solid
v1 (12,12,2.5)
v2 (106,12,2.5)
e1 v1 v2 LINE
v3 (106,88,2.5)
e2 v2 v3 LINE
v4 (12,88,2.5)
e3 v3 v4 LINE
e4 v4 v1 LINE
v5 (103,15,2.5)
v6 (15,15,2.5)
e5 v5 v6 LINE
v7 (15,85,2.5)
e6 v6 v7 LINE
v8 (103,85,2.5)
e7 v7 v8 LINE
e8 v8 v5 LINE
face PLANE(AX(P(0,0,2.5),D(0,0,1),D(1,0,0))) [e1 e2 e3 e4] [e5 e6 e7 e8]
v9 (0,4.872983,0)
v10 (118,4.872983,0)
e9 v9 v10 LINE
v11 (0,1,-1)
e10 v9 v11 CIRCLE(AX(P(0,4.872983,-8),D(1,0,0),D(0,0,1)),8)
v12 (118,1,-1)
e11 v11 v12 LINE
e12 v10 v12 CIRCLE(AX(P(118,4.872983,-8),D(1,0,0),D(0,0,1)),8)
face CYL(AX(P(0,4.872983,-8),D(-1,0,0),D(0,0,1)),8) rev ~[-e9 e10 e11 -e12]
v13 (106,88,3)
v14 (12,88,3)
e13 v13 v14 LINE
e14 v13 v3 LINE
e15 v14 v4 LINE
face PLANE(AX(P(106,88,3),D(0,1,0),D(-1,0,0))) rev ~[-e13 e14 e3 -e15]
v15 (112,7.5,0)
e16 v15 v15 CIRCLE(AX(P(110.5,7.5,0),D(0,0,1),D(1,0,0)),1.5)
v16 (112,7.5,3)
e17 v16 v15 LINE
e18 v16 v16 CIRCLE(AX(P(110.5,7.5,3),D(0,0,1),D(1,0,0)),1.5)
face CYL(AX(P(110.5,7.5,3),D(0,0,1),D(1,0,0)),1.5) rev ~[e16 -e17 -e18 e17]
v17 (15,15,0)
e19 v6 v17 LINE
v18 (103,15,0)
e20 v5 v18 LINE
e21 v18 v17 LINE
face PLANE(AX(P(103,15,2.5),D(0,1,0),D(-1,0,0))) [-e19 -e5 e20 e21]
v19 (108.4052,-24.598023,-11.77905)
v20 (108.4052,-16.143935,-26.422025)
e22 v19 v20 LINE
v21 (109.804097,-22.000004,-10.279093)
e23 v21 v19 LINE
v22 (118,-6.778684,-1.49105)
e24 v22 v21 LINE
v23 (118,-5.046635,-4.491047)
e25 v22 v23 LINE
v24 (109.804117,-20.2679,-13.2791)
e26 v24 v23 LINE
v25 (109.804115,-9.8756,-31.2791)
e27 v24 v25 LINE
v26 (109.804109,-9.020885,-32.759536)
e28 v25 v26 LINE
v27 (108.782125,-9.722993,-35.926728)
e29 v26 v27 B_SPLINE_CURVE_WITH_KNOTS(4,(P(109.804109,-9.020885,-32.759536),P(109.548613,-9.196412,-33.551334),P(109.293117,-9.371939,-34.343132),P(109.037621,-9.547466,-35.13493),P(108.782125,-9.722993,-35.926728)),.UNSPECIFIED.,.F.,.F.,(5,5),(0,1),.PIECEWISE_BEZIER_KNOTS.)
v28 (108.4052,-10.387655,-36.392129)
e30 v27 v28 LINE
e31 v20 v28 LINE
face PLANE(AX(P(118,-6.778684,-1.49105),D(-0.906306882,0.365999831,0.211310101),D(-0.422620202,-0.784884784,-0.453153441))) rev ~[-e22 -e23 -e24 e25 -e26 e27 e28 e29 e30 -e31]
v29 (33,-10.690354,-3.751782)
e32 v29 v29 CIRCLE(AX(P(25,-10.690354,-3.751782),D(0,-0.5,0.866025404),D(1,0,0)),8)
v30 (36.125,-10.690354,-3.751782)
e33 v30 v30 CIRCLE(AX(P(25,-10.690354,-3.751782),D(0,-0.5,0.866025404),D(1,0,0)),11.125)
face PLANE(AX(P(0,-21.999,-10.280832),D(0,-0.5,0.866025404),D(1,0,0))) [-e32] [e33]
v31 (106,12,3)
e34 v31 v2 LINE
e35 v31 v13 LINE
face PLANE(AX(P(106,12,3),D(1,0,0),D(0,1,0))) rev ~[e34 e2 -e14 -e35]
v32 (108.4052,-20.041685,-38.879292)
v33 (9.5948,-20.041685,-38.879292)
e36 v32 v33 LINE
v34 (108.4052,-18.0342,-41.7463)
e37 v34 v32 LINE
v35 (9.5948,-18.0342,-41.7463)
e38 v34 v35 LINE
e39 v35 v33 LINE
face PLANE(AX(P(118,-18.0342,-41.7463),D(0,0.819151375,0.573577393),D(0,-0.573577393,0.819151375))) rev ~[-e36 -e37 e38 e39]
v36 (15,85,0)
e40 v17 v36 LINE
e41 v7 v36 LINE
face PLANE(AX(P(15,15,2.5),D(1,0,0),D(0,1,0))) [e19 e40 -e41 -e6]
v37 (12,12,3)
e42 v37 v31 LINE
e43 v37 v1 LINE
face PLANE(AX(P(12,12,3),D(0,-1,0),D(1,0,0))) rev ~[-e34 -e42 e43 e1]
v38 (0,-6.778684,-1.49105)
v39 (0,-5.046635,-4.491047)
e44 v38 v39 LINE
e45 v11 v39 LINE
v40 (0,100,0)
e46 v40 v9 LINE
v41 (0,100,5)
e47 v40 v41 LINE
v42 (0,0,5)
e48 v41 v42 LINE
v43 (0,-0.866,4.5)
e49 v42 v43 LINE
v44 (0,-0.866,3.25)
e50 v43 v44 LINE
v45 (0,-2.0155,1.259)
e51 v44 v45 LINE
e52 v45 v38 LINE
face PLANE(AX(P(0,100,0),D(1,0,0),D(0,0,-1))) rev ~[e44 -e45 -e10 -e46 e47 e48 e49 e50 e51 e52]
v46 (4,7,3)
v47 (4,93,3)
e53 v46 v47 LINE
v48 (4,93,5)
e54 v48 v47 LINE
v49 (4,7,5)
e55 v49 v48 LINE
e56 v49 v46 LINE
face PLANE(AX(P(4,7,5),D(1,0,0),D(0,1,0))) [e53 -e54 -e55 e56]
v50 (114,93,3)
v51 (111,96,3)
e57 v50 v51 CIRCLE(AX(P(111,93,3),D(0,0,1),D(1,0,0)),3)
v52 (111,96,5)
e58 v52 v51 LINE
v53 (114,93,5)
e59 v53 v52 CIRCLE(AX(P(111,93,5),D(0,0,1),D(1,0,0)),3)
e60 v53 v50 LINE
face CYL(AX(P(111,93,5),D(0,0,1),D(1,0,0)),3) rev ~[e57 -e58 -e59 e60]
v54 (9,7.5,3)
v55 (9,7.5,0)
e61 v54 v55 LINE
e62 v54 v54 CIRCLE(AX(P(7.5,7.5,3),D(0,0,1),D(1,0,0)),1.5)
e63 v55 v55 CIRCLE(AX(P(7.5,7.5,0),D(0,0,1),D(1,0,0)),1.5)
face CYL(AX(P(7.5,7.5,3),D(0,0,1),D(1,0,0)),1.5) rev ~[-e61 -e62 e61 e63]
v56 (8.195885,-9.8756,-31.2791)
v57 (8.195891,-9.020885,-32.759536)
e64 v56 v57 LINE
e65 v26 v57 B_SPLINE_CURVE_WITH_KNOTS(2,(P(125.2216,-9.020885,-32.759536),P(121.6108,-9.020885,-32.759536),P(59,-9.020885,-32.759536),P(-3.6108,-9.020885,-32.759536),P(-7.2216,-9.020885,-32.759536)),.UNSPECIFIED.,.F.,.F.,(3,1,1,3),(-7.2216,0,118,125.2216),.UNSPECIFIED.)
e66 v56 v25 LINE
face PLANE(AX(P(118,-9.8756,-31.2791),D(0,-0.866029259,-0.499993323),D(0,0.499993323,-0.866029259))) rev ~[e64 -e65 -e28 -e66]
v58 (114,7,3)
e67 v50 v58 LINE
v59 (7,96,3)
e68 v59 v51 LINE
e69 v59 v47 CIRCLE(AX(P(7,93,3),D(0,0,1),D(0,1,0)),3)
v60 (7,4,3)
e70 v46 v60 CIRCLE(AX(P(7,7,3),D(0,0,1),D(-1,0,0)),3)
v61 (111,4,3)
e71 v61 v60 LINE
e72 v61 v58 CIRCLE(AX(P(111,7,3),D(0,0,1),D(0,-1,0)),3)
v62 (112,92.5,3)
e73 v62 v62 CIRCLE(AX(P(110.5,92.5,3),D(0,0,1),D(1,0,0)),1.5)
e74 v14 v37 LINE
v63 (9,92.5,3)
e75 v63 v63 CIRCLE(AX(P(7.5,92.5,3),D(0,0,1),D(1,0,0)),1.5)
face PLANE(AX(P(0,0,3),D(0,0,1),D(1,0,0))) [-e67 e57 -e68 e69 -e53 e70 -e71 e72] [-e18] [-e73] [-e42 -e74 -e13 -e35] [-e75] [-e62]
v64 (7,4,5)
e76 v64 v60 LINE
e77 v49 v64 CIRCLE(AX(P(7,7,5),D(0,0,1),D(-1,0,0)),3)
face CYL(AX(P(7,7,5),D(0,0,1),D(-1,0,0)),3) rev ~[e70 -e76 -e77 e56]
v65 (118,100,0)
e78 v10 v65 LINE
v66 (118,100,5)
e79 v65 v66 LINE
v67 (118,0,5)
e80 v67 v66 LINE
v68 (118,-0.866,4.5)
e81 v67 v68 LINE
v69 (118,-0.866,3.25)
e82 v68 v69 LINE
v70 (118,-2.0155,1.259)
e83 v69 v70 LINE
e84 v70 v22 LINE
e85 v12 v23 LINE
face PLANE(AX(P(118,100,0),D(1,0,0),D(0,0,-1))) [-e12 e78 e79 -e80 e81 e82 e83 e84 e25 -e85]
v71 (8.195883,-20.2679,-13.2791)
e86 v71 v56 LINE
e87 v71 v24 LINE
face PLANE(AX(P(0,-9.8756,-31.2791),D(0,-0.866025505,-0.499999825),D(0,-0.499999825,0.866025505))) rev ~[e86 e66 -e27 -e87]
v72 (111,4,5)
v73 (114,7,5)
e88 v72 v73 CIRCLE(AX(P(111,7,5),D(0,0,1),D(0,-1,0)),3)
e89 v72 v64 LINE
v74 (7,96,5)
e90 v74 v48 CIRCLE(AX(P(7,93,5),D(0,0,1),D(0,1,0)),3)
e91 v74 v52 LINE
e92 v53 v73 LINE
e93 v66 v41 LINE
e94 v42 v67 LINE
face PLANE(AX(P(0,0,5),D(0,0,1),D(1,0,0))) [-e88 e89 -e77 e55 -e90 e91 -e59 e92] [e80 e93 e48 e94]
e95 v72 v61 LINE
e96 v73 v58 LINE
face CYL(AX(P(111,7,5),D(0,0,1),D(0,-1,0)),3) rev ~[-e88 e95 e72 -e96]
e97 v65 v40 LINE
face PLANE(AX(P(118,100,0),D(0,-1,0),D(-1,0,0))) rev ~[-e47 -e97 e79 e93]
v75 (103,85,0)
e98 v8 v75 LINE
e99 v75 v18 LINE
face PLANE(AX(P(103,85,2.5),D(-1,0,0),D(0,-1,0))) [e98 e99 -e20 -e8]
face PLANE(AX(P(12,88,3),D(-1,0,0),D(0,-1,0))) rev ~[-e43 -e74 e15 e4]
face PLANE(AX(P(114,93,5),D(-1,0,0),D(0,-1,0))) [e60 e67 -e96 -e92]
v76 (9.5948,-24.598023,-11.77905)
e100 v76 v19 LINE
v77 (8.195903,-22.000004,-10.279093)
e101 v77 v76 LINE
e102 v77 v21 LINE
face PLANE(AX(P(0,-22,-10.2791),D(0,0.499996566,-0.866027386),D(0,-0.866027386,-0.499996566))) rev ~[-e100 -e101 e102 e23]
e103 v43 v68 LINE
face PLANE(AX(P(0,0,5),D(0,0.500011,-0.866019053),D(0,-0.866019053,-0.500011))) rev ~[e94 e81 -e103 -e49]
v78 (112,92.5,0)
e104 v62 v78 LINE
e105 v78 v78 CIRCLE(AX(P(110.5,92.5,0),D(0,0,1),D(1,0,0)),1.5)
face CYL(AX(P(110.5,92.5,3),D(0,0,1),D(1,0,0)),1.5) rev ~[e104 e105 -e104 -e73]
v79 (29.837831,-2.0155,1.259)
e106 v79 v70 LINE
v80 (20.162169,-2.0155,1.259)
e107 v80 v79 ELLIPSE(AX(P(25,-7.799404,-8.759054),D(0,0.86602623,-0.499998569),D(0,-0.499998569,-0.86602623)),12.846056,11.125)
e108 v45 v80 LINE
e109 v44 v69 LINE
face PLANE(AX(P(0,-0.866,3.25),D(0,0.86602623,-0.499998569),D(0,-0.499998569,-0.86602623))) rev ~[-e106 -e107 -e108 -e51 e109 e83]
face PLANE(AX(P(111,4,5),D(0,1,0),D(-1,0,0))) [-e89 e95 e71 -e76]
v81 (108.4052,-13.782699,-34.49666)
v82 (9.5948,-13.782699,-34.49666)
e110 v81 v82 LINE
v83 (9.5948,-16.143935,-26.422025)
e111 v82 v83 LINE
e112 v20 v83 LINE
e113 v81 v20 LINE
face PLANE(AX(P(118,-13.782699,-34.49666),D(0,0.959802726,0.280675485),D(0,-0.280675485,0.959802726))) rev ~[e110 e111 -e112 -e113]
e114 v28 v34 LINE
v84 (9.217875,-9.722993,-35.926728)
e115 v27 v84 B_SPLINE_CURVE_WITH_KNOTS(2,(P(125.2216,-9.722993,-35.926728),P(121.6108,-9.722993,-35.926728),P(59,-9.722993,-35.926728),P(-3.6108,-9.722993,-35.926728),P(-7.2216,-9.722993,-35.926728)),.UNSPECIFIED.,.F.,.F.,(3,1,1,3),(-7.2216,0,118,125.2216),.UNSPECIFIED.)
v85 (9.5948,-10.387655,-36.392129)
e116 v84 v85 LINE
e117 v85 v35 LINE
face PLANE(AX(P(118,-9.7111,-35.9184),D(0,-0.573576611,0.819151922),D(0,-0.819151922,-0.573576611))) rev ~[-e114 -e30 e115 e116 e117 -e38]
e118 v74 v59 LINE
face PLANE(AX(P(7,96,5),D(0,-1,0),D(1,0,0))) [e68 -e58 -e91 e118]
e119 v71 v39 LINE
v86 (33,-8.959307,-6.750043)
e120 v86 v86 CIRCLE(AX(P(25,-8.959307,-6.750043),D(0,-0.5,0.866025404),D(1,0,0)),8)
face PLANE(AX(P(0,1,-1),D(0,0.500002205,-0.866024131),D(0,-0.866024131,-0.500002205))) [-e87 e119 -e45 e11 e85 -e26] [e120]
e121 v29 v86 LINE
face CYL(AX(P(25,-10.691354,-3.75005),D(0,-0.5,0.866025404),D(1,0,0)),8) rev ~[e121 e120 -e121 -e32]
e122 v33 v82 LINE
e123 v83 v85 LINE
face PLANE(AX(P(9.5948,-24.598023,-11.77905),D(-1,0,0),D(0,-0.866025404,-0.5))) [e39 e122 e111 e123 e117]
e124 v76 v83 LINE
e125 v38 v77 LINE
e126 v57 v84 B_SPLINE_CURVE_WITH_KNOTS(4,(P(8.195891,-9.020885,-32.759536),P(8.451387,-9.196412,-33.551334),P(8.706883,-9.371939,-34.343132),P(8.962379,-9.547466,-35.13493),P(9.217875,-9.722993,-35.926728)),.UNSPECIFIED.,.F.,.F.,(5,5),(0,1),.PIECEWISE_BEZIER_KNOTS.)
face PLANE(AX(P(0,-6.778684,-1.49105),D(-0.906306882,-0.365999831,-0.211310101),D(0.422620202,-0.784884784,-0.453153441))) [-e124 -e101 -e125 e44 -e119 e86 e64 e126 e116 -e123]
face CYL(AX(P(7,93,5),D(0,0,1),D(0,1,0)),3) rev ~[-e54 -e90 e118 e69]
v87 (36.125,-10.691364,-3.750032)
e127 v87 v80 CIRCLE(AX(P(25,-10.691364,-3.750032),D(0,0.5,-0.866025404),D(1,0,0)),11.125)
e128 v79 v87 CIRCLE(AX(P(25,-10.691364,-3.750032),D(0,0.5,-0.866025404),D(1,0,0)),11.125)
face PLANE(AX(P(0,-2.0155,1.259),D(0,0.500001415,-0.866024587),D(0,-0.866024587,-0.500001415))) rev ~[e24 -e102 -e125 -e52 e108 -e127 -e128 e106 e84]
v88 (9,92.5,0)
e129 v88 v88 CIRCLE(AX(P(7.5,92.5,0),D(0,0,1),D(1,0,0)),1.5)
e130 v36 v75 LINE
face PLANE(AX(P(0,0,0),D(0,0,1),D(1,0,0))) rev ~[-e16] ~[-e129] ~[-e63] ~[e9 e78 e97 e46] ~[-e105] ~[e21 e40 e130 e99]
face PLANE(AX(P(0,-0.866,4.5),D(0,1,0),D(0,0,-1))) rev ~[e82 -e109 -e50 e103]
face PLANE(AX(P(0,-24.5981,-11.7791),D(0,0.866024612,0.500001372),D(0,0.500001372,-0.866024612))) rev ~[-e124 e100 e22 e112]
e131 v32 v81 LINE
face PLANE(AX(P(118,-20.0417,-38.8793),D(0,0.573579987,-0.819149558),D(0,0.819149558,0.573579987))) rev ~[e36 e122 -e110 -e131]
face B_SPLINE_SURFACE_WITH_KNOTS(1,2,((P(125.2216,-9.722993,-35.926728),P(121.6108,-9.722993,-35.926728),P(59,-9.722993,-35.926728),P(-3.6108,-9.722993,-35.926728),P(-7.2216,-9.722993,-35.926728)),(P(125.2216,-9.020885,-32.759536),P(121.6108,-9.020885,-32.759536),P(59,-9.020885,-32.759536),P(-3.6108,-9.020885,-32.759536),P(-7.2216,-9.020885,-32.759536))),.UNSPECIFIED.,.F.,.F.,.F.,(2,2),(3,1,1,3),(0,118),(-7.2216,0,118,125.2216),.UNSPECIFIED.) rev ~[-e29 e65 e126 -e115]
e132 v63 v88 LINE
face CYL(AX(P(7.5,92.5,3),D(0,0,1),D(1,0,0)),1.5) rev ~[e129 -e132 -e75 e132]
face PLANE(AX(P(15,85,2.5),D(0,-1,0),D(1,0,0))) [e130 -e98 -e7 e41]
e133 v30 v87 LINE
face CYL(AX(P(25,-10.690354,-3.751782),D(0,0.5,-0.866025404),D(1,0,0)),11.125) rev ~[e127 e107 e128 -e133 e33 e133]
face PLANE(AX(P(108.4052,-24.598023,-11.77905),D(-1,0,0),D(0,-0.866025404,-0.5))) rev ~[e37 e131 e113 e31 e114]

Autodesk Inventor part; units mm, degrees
ref_plane "YZ Plane" through (0, 0, 0) normal (1, 0, 0) x (0, 1, 0)
ref_plane "XZ Plane" through (0, 0, 0) normal (0, 1, 0) x (-1, 0, 0)
ref_plane "XY Plane" through (0, 0, 0) normal (0, 0, 1) x (1, 0, 0)
sketch "Sketch1" plane through (0, 0, 0) normal (0, 0, 1) x (1, 0, 0)
  line L0 (0, 0) -> (118, 0)
  line L1 (118, 0) -> (118, 100)
  line L2 (118, 100) -> (0, 100)
  line L3 (0, 100) -> (0, 0)
  line L4 (-23.6, 0) -> (141.6, 0) projected
  line L5 (0, -20) -> (0, 120) projected
  dimension "d3" = 118
  dimension "d4" = 100
  dimension "d45" = 0
  dimension "d46" = 0
extrude "Extrusion1" add sketch "Sketch1" along normal blind 5
sketch "Sketch2" plane through (0, 0, 5) normal (0, 0, 1) x (1, 0, 0)
  line L0 (7, 96) -> (111, 96)
  line L1 (114, 93) -> (114, 7)
  line L2 (111, 4) -> (7, 4)
  line L3 (4, 7) -> (4, 93)
  line L4 (118, 100) -> (0, 100) projected
  line L5 (0, 100) -> (0, 0) projected
  line L6 (0, 0) -> (118, 0) projected
  arc A0 (7, 96) -> (4, 93) centre (7, 93) ccw
  arc A1 (114, 93) -> (111, 96) centre (111, 93) ccw
  arc A2 (111, 4) -> (114, 7) centre (111, 7) ccw
  arc A3 (4, 7) -> (7, 4) centre (7, 7) ccw
  point P0 (4, 96)
  point P1 (114, 4)
  point P2 (114, 96)
  dimension "d7" = 110
  dimension "d8" = 92
  dimension "d10" = 4
  dimension "d11" = 4
  dimension "d12" = 3
extrude "Extrusion2" cut sketch "Sketch2" against normal blind 2
sketch "Sketch3" plane through (0, 0, 3) normal (0, 0, 1) x (1, 0, 0)
  line L0 (12, 12) -> (106, 12)
  line L1 (106, 12) -> (106, 88)
  line L2 (106, 88) -> (12, 88)
  line L3 (12, 88) -> (12, 12)
  line L4 (7, 96) -> (111, 96) projected
  line L5 (111, 4) -> (7, 4) projected
  line L6 (4, 7) -> (4, 93) projected
  line L7 (114, 93) -> (114, 7) projected
  point P0 (0, 0)
  point P1 (114, 7)
  point P2 (11.024, 100)
  point P3 (121.024, 100)
  point P4 (120, 96)
  point P5 (120, 4)
  dimension "d19" = 8
  dimension "d20" = 8
  dimension "d21" = 8
  dimension "d22" = 8
extrude "Extrusion3" cut sketch "Sketch3" against normal blind 0.5
sketch "Sketch4" plane through (0, 0, 2.5) normal (0, 0, 1) x (1, 0, 0)
  line L0 (15, 85) -> (103, 85)
  line L1 (103, 85) -> (103, 15)
  line L2 (103, 15) -> (15, 15)
  line L3 (15, 15) -> (15, 85)
  line L4 (106, 12) -> (12, 12) projected
  line L5 (12, 12) -> (12, 88) projected
  point P0 (0, 0)
  dimension "d25" = 88
  dimension "d26" = 70
  dimension "d27" = 3
  dimension "d28" = 3
extrude "Extrusion4" cut sketch "Sketch4" against normal through all
sketch "Sketch5" plane through (0, 0, 3) normal (0, 0, 1) x (1, 0, 0)
  circle A0 centre (7.5, 7.5) radius 1.5
  circle A1 centre (110.5, 7.5) radius 1.5
  circle A2 centre (110.5, 92.5) radius 1.5
  circle A3 centre (7.5, 92.5) radius 1.5
  line L0 (7, 96) -> (111, 96) projected
  line L1 (4, 7) -> (4, 93) projected
  line L2 (111, 4) -> (7, 4) projected
  line L3 (114, 93) -> (114, 7) projected
  point P0 (0, 0)
  point P1 (114, 7)
  point P2 (11.024, 100)
  point P3 (121.024, 100)
  point P4 (120, 96)
  point P5 (120, 4)
  dimension "d31" = 3.5
  dimension "d32" = 3.5
  dimension "d33" = 3.5
  dimension "d34" = 3.5
  dimension "d35" = 3.5
  dimension "d36" = 3.5
  dimension "d37" = 3.5
  dimension "d38" = 3.5
  dimension "d39" = 3
  dimension "d40" = 3
  dimension "d41" = 3
  dimension "d42" = 3
extrude "Extrusion5" cut sketch "Sketch5" against normal blind 3.5
sketch "Sketch6" plane through (0, 0, 0) normal (-1, 0, 0) x (0, 0, 1)
  line L0 (-1, 1) -> (-13.2791, -20.2679)
  line L1 (5, 0) -> (5, 100) projected
  line L2 (1.259, -2.0155) -> (-10.2791, -22)
  line L3 (-13.2791, -20.2679) -> (-10.2791, -22)
  line L4 (-1, 1) -> (0, 1)
  line L5 (0, 0) -> (0, 100) projected
  line L6 (5, 0) -> (4.5, -0.866)
  line L7 (4.5, -0.866) -> (3.25, -0.866)
  line L8 (3.25, -0.866) -> (1.259, -2.0155)
  line L9 (0, 0) -> (5, 0) projected
  line L10 (5, 0) -> (0, 0)
  dimension "d47" = 30
  dimension "d48" = 30
  dimension "d49" = 90
  dimension "d50" = 22
  dimension "d51" = 120
  dimension "d52" = 1
  dimension "d53" = 1.25
  dimension "d54" = 150
  dimension "d55" = 0
  dimension "d57" = 90
  dimension "d58" = 1
  dimension "d59" = 3
  dimension "d60" = 1
  dimension "d67" = 30
  dimension "d68" = 120
  dimension "d69" = 150
extrude "Extrusion6" add sketch "Sketch6" against normal blind 118
sketch "Sketch7" plane through (0, -22, -10.2791) normal (0, -0.5, 0.8660254) x (1, 0, 0)
  line L0 (0, 26.6921) -> (118, 26.6921) projected
  circle A0 centre (25, 13.0581) radius 8
  line L1 (118, 25.0581) -> (0, 25.0581) projected
  line L2 (0, 0) -> (0, 23.0761) projected
  point P0 (0, 24.1921)
  dimension "d70" = 16
  dimension "d71" = 12
  dimension "d72" = 25
extrude "Extrusion7" cut sketch "Sketch7" against normal up to next
sketch "Sketch8" plane through (0, -22, -10.2791) normal (0, -0.5, 0.8660254) x (1, 0, 0)
  circle A0 centre (25, 13.0581) radius 8 projected
  circle A1 centre (25, 13.0581) radius 11.125
  point P0 (0, 24.1921)
  dimension "d75" = 22.25
extrude "Extrusion8" cut sketch "Sketch8" along normal blind 1
sketch "Sketch9" plane through (0, 100, 0) normal (-1, 0, 0) x (0, 0, 1)
  line L0 (-10.2791, -122) -> (1.259, -102.0155) projected
  line L1 (-10.2791, -122) -> (-11.7791, -124.5981)
  line L2 (-11.7791, -124.5981) -> (-32.7791, -112.4737)
  line L3 (-32.7791, -112.4737) -> (-31.2791, -109.8756)
  line L4 (-1, -99) -> (-13.2791, -120.2679) projected
  line L5 (-31.2791, -109.8756) -> (-13.2791, -120.2679)
  line L6 (-13.2791, -120.2679) -> (-10.2791, -122)
  point P0 (0, -100)
  dimension "d79" = 3
  dimension "d80" = 90
  dimension "d82" = 90
  dimension "d83" = 90
  dimension "d84" = 90
  dimension "d85" = 21
extrude "Extrusion9" add sketch "Sketch9" against normal blind 118
sketch "Sketch10" plane through (118, 100, 0) normal (1, 0, 0) x (0, 0, -1)
  line L0 (35.9184, -109.7111) -> (41.7463, -118.0342) projected
  line L1 (31.2791, -109.8756) -> (32.7791, -112.4737) projected
  line L2 (41.7463, -118.0342) -> (38.8793, -120.0417)
  line L3 (32.7791, -112.4737) -> (33.3495, -112.1444)
  line L4 (38.8793, -120.0417) -> (33.3495, -112.1444)
  line L5 (31.2791, -109.8756) -> (34.6648, -107.9209)
  line L6 (41.7463, -118.0342) -> (34.6648, -107.9209)
  line L7 (32.7791, -112.4737) -> (11.7791, -124.5981) projected
  point P0 (0, -100)
  dimension "d88" = 3.5
  dimension "d93" = 3.5
  dimension "d97" = 0
extrude "Extrusion10" add sketch "Sketch10" against normal blind 118
fillet "Fillet1" radius 8 1 edges at (59, 1, 0)
chamfer "Chamfer1" distance 2.2 angle 45 1 edges at (59, -7.9209, -34.6648)
chamfer "Chamfer2" distance 2 distance2 8 1 edges at (59, -12.1444, -33.3495) measured on face at (78.6667, -14.7768, -35.1927)
sketch "Sketch11" plane through (25, -10.6913, -3.75) normal (0, -0.5, 0.8660254) x (1, 0, 0)
  line L0 (-25, -16.0581) -> (-25, 10.0179) projected
  line L1 (-25, 10.0179) -> (-25, 4.5179)
  line L2 (-25, 4.5179) -> (-15.4052, -16.0581)
  line L3 (-25, -25.6623) -> (-25, -18.0505) projected
  line L4 (-25, 4.5179) -> (-25, -25.6623)
  line L5 (-25, -25.6623) -> (-15.4052, -25.6623)
  line L6 (-25, -16.0581) -> (93, -16.0581) projected
  line L7 (-15.4052, -16.0581) -> (-15.4052, -25.6623)
  line L8 (93, 10.0179) -> (93, 4.5179)
  line L9 (93, 4.5179) -> (83.4052, -16.0581)
  line L10 (83.4052, -16.0581) -> (83.4052, -25.6623)
  line L11 (93, -25.6623) -> (83.4052, -25.6623)
  line L12 (93, -25.6623) -> (93, 4.5179)
  line L13 (93, 10.0179) -> (93, -16.0581) projected
  point P0 (-25, 11.134)
  point P1 (-25, -18.0505)
  dimension "d101" = 5.5
  dimension "d102" = 25
  dimension "d105" = 5.5
  dimension "d106" = 0
  dimension "d107" = 35.6803
extrude "Extrusion11" cut sketch "Sketch11" against normal through all
equation "\"d39\" = d41"
equation "\"d40\" = d41"
equation "\"d42\" = d41"
properties part number "MainHousing_FrontMainShell"
